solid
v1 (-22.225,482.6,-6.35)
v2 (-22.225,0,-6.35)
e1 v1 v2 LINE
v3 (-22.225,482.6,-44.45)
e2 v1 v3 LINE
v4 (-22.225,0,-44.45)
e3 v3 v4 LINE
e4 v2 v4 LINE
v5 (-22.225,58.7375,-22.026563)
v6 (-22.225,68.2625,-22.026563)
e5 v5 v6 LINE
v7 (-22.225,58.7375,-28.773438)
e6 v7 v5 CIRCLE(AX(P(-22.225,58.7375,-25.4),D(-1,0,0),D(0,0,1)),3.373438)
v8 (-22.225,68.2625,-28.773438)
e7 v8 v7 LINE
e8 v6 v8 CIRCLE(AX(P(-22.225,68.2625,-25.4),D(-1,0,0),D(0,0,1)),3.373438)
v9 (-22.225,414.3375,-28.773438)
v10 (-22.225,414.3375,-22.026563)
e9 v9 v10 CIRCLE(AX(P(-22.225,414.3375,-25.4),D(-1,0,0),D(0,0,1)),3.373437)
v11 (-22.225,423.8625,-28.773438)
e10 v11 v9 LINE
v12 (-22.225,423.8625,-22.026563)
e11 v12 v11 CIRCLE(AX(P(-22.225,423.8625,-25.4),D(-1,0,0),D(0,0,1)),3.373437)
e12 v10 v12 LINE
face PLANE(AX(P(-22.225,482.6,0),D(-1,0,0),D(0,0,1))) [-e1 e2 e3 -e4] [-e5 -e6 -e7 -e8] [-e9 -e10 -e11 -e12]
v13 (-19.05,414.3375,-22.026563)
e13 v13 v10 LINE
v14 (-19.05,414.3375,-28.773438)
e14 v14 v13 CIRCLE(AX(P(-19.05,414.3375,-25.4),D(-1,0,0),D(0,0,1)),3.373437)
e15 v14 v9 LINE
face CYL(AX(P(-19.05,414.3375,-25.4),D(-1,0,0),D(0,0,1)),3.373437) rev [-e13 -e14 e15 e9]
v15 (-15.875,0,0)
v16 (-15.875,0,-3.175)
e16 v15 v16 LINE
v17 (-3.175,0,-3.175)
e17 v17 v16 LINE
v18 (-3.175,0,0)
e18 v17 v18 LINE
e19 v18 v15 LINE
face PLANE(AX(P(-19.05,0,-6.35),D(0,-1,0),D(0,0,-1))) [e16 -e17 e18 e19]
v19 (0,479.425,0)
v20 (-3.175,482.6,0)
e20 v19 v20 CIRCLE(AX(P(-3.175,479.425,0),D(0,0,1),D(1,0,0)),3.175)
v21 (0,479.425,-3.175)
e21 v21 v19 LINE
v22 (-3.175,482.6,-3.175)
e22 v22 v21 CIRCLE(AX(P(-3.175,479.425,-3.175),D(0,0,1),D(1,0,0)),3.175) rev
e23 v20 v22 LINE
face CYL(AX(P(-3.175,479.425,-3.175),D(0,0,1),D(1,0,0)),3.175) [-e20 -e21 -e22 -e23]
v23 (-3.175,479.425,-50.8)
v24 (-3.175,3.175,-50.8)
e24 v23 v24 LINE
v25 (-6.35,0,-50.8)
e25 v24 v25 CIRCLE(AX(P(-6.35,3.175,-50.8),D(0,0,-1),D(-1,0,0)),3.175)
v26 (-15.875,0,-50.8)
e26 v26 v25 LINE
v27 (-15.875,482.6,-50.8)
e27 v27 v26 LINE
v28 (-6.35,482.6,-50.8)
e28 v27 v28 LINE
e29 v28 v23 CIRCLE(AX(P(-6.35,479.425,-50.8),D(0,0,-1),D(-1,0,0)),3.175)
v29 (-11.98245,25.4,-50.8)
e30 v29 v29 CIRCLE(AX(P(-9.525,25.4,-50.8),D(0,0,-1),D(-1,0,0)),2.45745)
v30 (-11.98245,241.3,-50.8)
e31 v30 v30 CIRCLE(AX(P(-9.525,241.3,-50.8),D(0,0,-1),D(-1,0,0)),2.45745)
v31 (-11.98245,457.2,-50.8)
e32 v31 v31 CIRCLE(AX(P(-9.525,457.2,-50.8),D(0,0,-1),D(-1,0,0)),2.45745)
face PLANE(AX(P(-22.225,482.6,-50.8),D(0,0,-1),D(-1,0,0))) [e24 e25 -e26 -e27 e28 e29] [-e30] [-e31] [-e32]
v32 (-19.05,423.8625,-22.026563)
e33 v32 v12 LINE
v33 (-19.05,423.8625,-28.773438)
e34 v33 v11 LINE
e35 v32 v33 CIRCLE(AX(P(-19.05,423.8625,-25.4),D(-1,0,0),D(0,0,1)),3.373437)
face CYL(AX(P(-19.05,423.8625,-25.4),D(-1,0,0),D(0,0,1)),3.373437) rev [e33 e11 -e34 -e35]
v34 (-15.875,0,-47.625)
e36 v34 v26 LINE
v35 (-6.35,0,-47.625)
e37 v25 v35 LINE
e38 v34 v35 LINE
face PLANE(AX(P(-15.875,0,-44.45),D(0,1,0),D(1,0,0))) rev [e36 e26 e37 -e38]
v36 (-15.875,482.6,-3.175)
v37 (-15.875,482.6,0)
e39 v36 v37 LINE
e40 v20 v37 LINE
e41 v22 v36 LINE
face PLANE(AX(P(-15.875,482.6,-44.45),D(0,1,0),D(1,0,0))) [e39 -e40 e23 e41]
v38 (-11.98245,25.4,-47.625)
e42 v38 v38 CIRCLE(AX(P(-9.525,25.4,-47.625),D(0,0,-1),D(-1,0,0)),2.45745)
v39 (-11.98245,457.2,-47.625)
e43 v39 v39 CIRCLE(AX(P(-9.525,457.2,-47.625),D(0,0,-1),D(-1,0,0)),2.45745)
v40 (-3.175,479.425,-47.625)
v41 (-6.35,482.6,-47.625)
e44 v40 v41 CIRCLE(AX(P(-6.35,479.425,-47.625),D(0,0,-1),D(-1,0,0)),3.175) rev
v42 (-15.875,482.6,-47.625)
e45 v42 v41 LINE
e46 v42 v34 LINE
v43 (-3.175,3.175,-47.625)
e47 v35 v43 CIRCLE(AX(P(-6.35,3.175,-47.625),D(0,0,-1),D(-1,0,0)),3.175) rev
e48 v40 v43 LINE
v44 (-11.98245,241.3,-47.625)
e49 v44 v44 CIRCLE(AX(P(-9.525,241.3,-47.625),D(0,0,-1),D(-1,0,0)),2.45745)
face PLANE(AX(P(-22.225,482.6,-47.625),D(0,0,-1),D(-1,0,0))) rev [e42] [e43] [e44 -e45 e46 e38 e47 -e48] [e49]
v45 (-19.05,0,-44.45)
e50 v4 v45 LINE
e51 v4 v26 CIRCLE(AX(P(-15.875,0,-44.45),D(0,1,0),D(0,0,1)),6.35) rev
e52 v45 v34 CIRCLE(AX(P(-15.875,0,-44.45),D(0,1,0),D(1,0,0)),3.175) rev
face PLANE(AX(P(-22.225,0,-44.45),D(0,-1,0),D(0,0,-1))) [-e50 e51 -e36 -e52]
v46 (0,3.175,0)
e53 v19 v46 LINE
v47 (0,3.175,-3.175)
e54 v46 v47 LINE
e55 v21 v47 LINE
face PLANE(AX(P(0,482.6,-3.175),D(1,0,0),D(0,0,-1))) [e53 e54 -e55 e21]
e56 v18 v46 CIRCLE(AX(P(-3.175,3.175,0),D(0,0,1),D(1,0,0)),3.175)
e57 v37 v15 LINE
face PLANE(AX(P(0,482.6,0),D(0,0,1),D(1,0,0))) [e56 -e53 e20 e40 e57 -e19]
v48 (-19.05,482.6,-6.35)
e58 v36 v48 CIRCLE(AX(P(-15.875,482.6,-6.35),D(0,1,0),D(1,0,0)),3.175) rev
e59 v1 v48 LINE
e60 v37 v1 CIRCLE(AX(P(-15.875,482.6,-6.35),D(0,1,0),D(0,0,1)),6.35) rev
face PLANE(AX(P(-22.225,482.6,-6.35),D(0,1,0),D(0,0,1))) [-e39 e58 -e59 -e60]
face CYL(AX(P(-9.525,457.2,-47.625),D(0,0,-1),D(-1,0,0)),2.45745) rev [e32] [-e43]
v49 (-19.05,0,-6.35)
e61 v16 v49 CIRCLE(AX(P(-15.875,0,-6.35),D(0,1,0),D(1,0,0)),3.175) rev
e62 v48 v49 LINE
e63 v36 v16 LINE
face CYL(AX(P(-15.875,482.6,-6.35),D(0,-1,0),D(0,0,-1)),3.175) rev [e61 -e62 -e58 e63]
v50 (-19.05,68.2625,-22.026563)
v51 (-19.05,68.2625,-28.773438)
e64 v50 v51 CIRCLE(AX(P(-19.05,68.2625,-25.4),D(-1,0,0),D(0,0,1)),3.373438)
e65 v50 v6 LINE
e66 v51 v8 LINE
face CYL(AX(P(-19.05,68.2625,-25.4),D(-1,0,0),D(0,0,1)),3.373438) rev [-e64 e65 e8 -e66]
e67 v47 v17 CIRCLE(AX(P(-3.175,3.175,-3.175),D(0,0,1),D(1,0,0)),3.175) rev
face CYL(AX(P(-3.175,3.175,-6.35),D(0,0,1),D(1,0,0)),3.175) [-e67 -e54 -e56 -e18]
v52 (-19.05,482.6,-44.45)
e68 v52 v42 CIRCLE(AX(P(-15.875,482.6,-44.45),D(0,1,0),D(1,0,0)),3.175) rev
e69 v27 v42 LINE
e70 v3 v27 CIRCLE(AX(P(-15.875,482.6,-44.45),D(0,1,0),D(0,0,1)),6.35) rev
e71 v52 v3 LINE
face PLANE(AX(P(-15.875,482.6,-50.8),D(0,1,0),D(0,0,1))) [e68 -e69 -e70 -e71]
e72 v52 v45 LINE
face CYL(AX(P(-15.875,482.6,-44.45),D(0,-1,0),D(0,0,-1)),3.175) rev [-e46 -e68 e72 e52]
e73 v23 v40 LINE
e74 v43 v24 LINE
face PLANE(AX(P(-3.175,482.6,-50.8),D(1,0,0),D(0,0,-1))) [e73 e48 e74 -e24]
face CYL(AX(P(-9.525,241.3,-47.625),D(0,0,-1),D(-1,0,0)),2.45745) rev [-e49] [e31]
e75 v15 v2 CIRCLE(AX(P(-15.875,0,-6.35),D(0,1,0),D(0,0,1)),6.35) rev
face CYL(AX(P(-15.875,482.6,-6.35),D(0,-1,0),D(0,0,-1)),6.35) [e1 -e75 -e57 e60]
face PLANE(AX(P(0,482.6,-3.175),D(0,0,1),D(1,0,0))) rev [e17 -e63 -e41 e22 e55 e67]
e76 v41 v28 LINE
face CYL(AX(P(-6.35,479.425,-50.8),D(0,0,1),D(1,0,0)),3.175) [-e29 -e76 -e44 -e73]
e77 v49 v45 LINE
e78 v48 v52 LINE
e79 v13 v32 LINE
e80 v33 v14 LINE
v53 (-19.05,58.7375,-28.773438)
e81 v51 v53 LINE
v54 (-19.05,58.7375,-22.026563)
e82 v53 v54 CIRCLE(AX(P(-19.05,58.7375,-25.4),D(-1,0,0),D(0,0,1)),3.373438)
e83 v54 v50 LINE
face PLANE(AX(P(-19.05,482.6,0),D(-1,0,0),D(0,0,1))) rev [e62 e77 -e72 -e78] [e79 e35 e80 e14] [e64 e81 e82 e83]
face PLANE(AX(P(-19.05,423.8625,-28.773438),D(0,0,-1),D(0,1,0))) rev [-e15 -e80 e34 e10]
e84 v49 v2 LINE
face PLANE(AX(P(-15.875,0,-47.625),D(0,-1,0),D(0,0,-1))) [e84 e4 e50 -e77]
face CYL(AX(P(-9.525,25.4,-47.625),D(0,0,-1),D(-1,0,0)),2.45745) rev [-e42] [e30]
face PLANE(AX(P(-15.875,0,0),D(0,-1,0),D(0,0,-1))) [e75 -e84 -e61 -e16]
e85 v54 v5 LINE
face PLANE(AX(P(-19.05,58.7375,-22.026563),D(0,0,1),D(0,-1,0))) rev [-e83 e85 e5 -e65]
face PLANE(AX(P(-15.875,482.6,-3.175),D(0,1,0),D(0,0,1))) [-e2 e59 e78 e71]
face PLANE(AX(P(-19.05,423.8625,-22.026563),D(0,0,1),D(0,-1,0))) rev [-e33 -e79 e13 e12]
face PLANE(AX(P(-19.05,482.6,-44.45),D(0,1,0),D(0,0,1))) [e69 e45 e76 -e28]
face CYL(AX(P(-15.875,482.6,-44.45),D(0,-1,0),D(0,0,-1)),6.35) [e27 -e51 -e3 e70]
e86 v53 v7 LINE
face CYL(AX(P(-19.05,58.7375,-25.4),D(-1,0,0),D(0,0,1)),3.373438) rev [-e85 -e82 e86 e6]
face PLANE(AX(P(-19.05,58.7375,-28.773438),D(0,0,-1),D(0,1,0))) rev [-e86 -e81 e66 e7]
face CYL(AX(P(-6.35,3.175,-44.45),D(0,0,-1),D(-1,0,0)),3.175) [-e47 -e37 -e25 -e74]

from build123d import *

# Parameters (mm, degrees)
BASE_FLANGE1_DEPTH = 482.6
SKETCH6_R          = 2.45745
CUT_EXTRUDE1_DEPTH = 3.175
FILLET1_R          = 3.175
CUT_EXTRUDE3_DEPTH = 3.175


# Sheet-metal steps are written as plain solids
with BuildPart() as part:
    # Sketch1 → Base-Flange1 (new body)
    with BuildSketch(Plane(origin=(0, 0, 0), x_dir=(1, 0, 0), z_dir=(0, 1, 0))):
        with BuildLine():
            Line((0, 0), (-15.875, 0))
            ThreePointArc((-15.875, 0), (-20.365128061, 1.859871939), (-22.225, 6.35))
            Line((-22.225, 6.35), (-22.225, 44.45))
            ThreePointArc((-22.225, 44.45), (-20.365128061, 48.940128061), (-15.875, 50.8))
            Line((-15.875, 50.8), (-3.175, 50.8))
            Line((-3.175, 50.8), (-3.175, 47.625))
            Line((-3.175, 47.625), (-15.875, 47.625))
            ThreePointArc((-15.875, 47.625), (-18.12006403, 46.69506403), (-19.05, 44.45))
            Line((-19.05, 44.45), (-19.05, 6.35))
            ThreePointArc((-19.05, 6.35), (-18.12006403, 4.10493597), (-15.875, 3.175))
            Line((-15.875, 3.175), (0, 3.175))
            Line((0, 3.175), (0, 0))
        make_face()
    extrude(amount=BASE_FLANGE1_DEPTH)

    # Sketch6 → Cut-Extrude1 (cut)
    with BuildSketch(Plane(origin=(0, 0, -50.8), x_dir=(-1, 0, 0), z_dir=(0, 0, -1))):
        with Locations((9.525, 457.2)):
            Circle(SKETCH6_R)
        with Locations((9.525, 25.4)):
            Circle(SKETCH6_R)
        with Locations((9.525, 241.3)):
            Circle(SKETCH6_R)
    extrude(amount=-CUT_EXTRUDE1_DEPTH, mode=Mode.SUBTRACT)

    # Fillet1
    fillet1_edges = [part.edges().sort_by_distance(p)[0] for p in [
        (-3.175, 0, -49.2125),
        (0, 0, -1.5875),
        (-3.175, 482.6, -49.2125),
        (0, 482.6, -1.5875),
    ]]
    fillet(fillet1_edges, radius=FILLET1_R)

    # Sketch8 → Cut-Extrude3 (cut)
    with BuildSketch(Plane.ZY.offset(22.225)):
        with BuildLine():
            Line((-22.0265625, 423.8625), (-22.0265625, 414.3375))
            ThreePointArc((-22.0265625, 414.3375), (-25.4, 410.9640625), (-28.7734375, 414.3375))
            Line((-28.7734375, 414.3375), (-28.7734375, 423.8625))
            ThreePointArc((-28.7734375, 423.8625), (-25.4, 427.2359375), (-22.0265625, 423.8625))
        make_face()
        with BuildLine():
            Line((-28.7734375, 58.7375), (-28.7734375, 68.2625))
            ThreePointArc((-28.7734375, 68.2625), (-25.4, 71.6359375), (-22.0265625, 68.2625))
            Line((-22.0265625, 68.2625), (-22.0265625, 58.7375))
            ThreePointArc((-22.0265625, 58.7375), (-25.4, 55.3640625), (-28.7734375, 58.7375))
        make_face()
    extrude(amount=-CUT_EXTRUDE3_DEPTH, mode=Mode.SUBTRACT)


solid = part.part
